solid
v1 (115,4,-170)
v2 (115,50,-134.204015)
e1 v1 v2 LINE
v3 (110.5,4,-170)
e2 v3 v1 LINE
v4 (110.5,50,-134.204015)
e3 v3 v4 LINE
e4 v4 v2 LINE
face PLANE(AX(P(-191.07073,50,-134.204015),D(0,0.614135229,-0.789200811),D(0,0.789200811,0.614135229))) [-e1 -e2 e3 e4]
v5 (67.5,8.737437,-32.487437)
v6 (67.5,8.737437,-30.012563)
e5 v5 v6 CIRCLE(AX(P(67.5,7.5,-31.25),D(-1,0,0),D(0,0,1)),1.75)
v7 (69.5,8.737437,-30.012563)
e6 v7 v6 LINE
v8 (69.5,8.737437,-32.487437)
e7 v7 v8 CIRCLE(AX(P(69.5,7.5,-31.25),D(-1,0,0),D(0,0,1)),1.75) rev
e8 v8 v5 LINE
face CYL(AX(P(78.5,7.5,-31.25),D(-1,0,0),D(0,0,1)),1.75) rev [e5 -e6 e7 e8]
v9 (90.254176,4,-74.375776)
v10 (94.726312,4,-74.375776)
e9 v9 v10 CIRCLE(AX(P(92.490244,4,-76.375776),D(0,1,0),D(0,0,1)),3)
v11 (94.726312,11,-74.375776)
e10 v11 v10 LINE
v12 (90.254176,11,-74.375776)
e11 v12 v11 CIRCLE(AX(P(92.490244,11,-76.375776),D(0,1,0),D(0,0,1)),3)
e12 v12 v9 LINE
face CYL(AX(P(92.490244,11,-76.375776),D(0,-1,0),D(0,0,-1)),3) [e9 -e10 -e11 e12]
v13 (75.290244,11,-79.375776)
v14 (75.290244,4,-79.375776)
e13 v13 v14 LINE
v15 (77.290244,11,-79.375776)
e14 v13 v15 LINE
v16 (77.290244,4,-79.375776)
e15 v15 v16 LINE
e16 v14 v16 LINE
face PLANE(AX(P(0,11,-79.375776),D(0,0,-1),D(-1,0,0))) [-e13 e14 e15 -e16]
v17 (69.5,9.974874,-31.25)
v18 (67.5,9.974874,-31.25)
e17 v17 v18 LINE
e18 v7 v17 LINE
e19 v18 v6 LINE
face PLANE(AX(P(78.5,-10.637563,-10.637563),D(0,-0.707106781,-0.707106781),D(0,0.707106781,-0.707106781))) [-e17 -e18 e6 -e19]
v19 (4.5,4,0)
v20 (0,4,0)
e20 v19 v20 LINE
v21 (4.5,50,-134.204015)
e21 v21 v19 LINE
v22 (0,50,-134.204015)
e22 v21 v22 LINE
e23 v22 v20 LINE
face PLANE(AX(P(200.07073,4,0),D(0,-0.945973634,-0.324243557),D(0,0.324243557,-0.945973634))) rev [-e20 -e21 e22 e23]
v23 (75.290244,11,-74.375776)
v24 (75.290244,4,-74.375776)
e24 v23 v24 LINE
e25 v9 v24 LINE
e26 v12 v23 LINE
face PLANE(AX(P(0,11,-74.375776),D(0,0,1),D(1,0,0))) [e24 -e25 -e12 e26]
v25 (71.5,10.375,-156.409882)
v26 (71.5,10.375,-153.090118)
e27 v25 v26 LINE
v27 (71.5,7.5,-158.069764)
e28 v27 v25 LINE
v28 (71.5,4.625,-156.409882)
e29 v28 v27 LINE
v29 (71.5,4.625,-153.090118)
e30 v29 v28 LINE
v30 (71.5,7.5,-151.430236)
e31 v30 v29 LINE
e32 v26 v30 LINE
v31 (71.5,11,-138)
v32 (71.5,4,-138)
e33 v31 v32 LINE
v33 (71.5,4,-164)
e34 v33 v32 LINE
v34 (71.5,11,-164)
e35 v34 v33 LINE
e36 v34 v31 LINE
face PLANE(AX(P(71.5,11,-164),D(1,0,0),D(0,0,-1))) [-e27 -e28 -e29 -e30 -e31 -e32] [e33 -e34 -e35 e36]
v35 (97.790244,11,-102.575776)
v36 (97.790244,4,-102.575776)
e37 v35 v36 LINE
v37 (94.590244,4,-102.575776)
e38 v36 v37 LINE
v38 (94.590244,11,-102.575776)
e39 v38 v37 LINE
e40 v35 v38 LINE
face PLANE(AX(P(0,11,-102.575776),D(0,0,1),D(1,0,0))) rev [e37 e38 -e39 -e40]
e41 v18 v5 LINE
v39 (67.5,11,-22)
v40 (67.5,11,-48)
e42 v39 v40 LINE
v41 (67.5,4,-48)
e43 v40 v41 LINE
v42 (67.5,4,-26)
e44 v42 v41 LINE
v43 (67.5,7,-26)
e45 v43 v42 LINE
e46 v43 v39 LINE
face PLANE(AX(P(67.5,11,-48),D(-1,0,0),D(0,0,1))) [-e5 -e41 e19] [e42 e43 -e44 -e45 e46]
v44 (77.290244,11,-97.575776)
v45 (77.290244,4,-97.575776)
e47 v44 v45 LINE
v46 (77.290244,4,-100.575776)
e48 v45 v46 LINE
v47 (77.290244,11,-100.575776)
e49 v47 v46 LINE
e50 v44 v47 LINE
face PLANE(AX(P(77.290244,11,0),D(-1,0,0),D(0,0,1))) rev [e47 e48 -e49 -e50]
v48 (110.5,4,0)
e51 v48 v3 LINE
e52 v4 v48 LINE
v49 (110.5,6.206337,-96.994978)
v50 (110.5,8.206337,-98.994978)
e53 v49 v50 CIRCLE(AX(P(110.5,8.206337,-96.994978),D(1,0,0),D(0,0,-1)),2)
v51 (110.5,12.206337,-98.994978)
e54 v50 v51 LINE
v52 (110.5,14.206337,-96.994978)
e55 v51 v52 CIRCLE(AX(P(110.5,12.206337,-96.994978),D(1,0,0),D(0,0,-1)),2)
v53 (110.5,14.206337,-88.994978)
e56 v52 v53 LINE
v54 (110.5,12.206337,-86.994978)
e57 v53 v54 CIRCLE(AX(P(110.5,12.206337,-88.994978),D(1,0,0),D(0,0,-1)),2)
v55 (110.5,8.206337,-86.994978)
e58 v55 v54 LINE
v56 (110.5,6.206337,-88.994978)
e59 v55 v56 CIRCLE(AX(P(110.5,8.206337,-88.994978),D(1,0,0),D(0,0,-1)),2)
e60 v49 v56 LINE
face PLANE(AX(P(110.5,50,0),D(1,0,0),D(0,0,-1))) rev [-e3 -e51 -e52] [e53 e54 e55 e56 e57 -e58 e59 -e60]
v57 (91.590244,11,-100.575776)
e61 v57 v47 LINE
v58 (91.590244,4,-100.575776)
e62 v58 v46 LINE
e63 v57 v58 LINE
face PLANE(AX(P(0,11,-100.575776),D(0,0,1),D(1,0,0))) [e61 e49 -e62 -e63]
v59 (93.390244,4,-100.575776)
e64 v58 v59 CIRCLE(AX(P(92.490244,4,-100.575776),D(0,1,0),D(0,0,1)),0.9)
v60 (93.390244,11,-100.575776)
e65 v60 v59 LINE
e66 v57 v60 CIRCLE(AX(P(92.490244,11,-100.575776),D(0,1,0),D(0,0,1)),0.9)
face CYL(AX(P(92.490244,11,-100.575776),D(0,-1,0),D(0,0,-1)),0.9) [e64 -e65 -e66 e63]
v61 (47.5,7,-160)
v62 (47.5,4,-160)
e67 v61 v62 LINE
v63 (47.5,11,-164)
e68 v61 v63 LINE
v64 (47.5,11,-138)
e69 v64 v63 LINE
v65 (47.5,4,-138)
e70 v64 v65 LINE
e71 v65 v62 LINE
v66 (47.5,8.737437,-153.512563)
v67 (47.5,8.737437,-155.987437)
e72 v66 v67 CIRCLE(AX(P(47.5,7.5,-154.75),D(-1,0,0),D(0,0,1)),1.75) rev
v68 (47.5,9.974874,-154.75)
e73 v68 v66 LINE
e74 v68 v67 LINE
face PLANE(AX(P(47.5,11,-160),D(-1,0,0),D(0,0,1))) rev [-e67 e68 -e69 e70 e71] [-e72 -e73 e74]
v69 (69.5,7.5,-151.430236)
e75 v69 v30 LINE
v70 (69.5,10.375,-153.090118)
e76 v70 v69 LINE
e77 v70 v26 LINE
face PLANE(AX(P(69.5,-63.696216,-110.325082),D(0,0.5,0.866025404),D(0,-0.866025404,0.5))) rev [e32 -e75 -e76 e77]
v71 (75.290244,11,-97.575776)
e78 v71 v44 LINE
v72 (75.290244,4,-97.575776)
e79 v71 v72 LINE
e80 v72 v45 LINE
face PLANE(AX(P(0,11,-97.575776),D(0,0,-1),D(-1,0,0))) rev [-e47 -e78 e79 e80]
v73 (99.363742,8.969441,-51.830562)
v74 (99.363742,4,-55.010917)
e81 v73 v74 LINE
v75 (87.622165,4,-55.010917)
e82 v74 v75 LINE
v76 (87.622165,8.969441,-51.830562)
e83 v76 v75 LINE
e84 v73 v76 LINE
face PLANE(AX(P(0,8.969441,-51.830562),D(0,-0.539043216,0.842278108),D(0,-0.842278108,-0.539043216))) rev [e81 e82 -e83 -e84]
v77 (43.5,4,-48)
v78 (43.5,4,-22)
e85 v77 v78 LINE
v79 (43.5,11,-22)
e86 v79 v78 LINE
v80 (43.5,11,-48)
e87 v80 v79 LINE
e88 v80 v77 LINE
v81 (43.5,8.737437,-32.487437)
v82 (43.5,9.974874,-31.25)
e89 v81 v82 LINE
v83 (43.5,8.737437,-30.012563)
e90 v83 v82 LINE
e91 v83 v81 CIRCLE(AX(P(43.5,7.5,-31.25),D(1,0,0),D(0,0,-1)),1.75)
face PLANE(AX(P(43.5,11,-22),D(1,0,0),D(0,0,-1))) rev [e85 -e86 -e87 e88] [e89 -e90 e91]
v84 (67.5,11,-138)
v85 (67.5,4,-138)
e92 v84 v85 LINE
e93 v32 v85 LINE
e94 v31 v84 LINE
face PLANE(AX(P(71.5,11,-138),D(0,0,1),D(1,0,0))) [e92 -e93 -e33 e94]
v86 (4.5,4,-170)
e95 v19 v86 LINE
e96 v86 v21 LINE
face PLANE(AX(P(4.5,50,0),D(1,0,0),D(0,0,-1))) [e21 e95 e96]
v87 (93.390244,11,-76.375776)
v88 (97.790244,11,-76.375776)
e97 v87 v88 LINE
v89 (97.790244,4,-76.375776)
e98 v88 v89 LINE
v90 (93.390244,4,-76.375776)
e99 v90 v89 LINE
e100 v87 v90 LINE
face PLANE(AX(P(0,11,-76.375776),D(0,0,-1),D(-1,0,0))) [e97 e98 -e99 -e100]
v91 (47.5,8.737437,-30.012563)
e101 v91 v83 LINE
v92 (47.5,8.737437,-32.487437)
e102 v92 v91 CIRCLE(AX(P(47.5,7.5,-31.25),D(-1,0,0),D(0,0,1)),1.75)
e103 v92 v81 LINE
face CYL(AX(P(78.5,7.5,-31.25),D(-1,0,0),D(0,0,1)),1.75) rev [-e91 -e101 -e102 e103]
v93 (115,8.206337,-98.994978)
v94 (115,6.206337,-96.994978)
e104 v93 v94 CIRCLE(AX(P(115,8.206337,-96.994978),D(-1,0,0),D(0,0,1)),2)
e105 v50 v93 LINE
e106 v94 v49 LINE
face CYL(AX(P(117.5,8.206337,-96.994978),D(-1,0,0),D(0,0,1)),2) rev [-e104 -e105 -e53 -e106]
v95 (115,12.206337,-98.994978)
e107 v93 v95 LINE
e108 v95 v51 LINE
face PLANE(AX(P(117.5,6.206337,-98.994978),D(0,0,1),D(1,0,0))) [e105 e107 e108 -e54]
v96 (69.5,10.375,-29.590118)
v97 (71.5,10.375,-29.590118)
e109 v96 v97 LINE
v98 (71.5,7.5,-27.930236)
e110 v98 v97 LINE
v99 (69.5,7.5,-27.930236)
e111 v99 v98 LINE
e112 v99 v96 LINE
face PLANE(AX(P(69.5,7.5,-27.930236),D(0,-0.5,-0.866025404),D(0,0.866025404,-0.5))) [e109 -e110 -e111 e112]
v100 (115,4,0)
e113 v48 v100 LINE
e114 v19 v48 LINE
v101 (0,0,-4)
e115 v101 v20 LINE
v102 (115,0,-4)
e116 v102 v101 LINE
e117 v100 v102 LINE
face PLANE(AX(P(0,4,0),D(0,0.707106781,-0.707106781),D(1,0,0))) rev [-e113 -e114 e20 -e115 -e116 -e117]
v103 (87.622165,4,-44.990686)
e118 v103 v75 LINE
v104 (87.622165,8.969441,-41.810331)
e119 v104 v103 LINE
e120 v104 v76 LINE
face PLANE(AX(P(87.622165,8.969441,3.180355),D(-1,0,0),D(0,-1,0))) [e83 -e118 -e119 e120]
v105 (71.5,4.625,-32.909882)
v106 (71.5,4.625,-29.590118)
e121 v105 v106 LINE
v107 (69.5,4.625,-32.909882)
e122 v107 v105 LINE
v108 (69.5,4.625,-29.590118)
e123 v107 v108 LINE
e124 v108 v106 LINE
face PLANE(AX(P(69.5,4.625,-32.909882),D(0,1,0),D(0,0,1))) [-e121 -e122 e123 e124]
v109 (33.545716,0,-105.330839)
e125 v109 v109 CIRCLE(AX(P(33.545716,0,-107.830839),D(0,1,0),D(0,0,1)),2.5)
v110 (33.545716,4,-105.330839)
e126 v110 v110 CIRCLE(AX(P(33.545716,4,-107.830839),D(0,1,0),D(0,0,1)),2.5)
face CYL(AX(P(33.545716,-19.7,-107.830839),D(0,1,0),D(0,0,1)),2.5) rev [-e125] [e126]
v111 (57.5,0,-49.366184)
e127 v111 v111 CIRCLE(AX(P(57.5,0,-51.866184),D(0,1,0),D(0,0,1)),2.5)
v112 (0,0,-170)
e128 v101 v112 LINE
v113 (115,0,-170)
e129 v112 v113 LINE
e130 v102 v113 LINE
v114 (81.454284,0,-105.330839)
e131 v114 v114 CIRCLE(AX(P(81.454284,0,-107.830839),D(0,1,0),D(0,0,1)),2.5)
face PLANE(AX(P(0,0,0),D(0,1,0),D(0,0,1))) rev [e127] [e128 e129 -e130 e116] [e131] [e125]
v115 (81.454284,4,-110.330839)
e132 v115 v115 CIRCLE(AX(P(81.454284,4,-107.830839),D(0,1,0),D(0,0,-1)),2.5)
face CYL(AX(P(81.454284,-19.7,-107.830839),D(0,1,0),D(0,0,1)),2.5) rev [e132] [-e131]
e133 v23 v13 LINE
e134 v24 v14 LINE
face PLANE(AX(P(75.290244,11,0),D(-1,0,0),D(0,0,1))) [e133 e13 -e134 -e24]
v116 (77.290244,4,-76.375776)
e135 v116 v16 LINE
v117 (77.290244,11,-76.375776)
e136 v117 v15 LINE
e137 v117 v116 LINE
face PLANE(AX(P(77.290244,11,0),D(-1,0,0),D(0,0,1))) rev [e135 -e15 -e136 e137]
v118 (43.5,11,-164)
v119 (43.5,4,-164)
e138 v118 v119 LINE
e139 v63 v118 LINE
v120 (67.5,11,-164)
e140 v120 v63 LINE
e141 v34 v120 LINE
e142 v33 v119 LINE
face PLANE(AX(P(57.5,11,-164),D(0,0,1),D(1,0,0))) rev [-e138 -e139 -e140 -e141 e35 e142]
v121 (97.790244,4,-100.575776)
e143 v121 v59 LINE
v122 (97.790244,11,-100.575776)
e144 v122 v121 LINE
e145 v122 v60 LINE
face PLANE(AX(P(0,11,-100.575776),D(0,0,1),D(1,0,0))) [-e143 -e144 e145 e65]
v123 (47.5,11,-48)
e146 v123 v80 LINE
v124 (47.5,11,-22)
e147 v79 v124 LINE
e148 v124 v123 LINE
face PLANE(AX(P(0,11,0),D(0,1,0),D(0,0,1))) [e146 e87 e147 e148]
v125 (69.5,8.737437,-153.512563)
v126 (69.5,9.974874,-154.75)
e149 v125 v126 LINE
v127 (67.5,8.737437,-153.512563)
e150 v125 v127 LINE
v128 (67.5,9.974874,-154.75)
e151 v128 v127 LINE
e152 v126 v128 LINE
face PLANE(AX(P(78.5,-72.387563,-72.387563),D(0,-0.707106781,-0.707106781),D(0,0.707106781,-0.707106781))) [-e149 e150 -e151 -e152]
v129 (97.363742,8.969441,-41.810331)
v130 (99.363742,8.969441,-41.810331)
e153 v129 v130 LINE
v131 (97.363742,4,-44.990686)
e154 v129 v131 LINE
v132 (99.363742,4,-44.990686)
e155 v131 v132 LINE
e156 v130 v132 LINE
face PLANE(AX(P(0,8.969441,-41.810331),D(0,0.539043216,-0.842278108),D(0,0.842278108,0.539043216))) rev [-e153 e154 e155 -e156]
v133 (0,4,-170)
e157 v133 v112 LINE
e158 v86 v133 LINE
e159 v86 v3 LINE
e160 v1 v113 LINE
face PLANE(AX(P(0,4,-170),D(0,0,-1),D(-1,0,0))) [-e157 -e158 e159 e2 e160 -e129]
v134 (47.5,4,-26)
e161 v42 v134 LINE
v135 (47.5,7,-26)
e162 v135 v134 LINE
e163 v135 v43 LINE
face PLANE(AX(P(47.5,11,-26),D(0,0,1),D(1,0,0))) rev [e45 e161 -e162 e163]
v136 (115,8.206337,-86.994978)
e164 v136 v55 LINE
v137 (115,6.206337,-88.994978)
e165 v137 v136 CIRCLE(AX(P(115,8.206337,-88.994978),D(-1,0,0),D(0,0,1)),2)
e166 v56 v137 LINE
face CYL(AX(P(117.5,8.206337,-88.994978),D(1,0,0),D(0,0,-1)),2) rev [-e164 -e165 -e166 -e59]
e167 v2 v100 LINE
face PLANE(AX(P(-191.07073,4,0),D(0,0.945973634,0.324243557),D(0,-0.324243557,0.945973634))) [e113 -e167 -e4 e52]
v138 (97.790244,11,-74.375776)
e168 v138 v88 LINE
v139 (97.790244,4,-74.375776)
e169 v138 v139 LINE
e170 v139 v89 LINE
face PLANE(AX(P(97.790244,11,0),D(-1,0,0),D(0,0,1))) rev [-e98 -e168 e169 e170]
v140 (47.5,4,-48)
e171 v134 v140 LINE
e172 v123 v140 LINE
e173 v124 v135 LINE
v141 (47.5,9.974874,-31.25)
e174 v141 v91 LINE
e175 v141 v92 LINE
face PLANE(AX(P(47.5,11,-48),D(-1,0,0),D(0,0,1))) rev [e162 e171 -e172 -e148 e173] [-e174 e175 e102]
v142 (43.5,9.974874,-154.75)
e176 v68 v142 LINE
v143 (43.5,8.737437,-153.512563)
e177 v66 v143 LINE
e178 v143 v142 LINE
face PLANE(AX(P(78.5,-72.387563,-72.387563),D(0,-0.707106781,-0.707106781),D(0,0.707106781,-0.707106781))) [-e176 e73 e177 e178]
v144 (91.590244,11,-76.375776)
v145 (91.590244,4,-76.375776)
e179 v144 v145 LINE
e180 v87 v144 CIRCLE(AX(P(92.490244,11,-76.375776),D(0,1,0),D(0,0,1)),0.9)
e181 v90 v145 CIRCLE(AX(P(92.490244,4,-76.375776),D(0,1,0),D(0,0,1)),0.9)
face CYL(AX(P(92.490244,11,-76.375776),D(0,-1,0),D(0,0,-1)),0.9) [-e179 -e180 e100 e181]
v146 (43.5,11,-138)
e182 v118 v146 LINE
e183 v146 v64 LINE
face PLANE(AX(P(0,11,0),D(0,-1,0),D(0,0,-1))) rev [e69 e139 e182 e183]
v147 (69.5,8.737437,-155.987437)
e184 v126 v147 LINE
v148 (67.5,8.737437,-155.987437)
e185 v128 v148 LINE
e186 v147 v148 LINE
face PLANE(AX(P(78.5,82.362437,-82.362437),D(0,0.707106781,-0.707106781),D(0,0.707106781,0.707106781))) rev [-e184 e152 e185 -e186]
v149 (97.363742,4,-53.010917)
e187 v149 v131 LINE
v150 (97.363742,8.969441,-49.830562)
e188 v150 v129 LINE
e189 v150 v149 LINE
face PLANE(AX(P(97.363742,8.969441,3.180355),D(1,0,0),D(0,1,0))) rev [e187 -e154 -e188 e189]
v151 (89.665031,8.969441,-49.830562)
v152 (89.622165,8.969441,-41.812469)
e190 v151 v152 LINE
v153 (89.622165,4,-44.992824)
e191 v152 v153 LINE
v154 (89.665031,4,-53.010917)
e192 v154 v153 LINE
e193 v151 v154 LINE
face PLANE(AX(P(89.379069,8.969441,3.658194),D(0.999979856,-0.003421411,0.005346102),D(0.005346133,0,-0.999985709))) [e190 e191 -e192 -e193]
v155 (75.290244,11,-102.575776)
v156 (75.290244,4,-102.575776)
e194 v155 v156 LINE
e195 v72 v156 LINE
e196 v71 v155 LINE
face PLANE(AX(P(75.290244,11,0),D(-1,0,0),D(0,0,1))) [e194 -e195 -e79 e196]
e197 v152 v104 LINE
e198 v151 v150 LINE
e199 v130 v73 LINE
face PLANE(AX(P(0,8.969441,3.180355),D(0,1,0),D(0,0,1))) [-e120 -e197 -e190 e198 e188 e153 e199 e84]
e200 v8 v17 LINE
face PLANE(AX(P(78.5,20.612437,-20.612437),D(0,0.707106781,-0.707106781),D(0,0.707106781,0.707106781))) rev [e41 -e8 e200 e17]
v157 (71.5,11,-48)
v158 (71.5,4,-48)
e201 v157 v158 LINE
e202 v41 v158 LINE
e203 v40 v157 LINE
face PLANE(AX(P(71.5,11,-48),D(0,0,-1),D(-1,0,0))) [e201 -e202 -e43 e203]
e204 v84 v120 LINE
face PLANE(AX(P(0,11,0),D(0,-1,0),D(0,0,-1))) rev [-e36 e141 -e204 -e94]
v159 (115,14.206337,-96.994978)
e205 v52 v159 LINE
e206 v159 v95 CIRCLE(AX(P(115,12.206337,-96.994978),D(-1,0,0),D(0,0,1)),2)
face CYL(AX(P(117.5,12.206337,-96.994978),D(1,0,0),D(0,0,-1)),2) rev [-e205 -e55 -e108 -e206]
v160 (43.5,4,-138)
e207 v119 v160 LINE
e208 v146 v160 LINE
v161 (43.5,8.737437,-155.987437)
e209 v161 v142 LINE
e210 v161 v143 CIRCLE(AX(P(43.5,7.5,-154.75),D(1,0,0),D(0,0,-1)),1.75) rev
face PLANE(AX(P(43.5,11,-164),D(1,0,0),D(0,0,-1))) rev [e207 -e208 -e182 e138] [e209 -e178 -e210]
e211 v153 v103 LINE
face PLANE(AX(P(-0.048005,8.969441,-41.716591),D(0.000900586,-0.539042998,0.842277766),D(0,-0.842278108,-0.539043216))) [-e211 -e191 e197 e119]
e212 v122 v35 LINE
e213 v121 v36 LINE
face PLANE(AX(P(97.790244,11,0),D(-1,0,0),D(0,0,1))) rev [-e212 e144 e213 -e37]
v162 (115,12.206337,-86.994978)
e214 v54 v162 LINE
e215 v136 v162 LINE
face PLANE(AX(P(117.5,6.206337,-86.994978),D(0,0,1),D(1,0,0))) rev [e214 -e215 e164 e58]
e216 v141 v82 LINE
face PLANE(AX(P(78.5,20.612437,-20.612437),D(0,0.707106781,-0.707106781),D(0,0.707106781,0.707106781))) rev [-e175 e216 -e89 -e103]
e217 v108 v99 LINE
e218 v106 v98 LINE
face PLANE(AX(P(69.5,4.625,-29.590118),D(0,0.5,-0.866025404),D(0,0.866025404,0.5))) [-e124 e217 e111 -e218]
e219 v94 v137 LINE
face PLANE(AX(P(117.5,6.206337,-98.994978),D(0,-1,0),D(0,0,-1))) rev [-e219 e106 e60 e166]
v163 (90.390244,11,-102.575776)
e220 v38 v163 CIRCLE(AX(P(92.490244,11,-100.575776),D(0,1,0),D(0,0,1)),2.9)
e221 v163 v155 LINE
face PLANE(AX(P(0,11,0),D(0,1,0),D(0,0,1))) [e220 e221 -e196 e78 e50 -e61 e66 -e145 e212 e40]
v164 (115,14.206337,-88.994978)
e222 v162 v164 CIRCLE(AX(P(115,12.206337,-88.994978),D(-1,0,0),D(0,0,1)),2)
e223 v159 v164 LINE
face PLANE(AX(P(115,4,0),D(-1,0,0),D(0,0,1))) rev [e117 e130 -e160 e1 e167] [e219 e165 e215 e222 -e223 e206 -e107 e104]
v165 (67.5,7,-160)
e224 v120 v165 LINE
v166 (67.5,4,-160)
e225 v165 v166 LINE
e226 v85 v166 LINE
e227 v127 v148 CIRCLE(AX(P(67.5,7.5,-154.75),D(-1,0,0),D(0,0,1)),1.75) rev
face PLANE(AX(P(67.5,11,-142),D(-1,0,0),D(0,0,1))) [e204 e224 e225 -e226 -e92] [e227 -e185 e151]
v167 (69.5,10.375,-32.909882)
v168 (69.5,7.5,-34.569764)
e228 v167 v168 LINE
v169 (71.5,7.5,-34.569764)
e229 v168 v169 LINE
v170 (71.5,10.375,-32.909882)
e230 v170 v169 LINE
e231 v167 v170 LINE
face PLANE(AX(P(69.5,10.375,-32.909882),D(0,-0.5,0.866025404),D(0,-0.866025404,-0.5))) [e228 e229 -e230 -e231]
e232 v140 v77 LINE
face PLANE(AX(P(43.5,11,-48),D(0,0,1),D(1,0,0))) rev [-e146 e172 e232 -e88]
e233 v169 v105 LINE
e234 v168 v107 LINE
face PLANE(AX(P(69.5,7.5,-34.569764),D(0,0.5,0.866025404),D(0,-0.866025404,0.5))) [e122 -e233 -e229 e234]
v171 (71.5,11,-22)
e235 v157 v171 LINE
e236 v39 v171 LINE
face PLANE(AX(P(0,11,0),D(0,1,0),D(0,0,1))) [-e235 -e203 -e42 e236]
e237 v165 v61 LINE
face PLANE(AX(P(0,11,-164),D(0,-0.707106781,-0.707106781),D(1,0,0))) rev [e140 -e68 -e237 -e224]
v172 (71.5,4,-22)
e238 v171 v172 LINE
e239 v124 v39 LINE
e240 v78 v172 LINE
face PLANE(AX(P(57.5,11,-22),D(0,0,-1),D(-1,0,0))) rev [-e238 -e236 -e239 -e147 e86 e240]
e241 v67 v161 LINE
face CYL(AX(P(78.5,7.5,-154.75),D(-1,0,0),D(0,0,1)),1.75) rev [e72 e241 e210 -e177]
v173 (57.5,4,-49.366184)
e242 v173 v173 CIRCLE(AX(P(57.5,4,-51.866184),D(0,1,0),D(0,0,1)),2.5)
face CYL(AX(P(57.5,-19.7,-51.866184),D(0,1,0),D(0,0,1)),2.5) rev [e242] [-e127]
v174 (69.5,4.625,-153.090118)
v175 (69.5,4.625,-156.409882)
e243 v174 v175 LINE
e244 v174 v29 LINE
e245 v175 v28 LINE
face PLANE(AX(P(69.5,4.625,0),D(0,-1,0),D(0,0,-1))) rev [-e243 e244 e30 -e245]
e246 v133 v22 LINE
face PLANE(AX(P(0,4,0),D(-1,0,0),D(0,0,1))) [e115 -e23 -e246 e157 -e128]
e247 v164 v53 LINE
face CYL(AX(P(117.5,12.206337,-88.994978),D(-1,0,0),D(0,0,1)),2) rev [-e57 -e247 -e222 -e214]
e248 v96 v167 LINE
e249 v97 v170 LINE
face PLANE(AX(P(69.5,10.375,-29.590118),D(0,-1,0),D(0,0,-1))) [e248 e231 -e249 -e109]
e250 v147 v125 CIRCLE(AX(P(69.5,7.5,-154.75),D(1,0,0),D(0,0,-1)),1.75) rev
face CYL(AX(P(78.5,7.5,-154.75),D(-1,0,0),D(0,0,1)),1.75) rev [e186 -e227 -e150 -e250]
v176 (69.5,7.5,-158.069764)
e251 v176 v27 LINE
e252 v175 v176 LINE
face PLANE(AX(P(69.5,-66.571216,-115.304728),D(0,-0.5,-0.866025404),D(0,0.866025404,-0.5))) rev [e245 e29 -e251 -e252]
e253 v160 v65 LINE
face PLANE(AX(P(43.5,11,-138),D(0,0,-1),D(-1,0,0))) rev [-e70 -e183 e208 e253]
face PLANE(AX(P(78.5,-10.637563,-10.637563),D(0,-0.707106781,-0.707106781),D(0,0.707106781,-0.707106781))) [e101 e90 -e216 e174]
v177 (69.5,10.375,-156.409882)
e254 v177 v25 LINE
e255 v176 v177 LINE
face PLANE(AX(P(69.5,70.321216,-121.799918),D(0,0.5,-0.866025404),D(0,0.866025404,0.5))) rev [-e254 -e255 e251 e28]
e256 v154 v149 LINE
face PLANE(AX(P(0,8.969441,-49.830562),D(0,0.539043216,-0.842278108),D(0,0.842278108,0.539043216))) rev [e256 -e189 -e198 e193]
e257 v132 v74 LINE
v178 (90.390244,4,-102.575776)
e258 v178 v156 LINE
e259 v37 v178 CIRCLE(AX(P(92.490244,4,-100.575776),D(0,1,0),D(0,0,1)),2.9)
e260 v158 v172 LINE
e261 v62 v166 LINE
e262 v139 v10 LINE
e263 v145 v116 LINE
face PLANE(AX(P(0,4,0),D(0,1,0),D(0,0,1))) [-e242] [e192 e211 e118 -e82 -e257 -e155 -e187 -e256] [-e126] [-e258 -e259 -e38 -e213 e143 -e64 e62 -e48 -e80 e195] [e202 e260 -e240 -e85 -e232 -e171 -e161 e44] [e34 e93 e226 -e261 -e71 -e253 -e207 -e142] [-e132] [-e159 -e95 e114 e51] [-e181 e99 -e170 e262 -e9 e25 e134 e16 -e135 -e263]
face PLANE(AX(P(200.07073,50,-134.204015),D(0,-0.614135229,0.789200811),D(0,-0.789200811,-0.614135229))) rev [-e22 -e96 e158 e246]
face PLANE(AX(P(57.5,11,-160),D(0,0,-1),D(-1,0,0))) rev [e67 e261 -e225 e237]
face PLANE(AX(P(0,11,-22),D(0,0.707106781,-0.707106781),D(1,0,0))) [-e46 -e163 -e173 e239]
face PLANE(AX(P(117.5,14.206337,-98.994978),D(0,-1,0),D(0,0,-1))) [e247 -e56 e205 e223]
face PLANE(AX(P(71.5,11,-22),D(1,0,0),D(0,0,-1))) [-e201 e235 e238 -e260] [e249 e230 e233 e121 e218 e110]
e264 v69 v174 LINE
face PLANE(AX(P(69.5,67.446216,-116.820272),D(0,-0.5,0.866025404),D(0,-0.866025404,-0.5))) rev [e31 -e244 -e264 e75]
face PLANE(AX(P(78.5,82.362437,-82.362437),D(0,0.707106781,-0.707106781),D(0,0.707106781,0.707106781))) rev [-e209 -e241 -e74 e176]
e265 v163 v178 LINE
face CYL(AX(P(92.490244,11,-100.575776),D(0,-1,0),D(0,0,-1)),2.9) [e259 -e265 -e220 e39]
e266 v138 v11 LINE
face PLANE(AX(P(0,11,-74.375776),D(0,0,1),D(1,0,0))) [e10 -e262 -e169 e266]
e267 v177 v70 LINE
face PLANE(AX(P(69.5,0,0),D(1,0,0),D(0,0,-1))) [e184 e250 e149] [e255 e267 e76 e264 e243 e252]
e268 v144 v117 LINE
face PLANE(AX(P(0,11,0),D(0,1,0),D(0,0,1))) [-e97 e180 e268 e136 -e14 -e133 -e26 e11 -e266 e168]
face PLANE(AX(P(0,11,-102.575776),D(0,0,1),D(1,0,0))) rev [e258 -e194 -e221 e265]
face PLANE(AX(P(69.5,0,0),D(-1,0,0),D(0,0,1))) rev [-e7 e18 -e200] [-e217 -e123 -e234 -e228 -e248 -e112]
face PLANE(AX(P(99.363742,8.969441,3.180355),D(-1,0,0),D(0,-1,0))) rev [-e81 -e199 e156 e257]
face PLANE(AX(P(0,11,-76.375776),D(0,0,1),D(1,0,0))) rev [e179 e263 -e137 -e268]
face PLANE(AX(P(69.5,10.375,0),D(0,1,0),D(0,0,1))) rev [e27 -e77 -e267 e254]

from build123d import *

# Parameters (mm, degrees)
SKETCH1_W                  = 110.5
SKETCH1_H                  = 170
SKETCH1_W_2                = 4.5
BOSS_EXTRUDE1_DEPTH        = 4
SKETCH1_4_W                = 4.5
SKETCH1_4_H                = 170
BOSS_EXTRUDE2_DEPTH        = 50
CUT_EXTRUDE1_DEPTH         = 4.5
SALIENTE_EXTRUIR1_DEPTH    = 7
SALIENTE_EXTRUIR2_DEPTH    = 7
CORTAR_EXTRUIR1_DEPTH      = 31
CORTAR_EXTRUIR1_DEPTH_BACK = 7
CORTAR_EXTRUIR2_DEPTH      = 2
CHAFL_N1_SIZE              = 4
CHAFL_N2_SIZE              = 4
CROQUIS5_R                 = 2.5
CORTAR_EXTRUIR3_DEPTH      = 23.7
CHAFL_N3_SIZE              = 4
SALIENTE_EXTRUIR4_DEPTH    = 7
CROQUIS8_W                 = 12
CROQUIS8_H                 = 8
CORTAR_EXTRUIR4_DEPTH      = 7
REDONDEO1_R                = 2


with BuildPart() as part:
    # Sketch1 → Boss-Extrude1 (new body)
    with BuildSketch(Plane(origin=(0, 0, 0), x_dir=(1, 0, 0), z_dir=(0, 1, 0))):
        with Locations((59.75, 85)):
            Rectangle(SKETCH1_W, SKETCH1_H)
        with Locations((2.25, 85)):
            Rectangle(SKETCH1_W_2, SKETCH1_H)
    extrude(amount=BOSS_EXTRUDE1_DEPTH)

    # Sketch1<4> → Boss-Extrude2 (add)
    with BuildSketch(Plane(origin=(0, 0, 0), x_dir=(1, 0, 0), z_dir=(0, 1, 0))):
        with Locations((2.25, 85)):
            Rectangle(SKETCH1_4_W, SKETCH1_4_H)
    boss_extrude2 = extrude(amount=BOSS_EXTRUDE2_DEPTH)

    # Sketch2 → Cut-Extrude1 (cut)
    with BuildSketch(Plane.ZY):
        Polygon((-134.204014838, 50), (-170, 4), (-182.392562203, 4), (-182.392562203, 57.402643918), (5.745866014, 57.402643918), (5.745866014, 4), (0, 4), align=None)
    cut_extrude1 = extrude(amount=-CUT_EXTRUDE1_DEPTH, mode=Mode.SUBTRACT)

    # Mirror1: Boss-Extrude2, Cut-Extrude1 across plane
    add(boss_extrude2.mirror(Plane(origin=(57.5, 0, 0), x_dir=(0, 0, 1), z_dir=(1, 0, 0))))
    add(cut_extrude1.mirror(Plane(origin=(57.5, 0, 0), x_dir=(0, 0, 1), z_dir=(1, 0, 0))), mode=Mode.SUBTRACT)

    # Sketch3 → Saliente-Extruir1 (add)
    with BuildSketch(Plane(origin=(0, 4, 0), x_dir=(1, 0, 0), z_dir=(0, 1, 0))):
        Polygon((57.5, 160), (47.5, 160), (47.5, 142), (47.5, 138), (43.5, 138), (43.5, 164), (57.5, 164), align=None)
    saliente_extruir1 = extrude(amount=SALIENTE_EXTRUIR1_DEPTH)

    # Croquis1 → Saliente-Extruir2 (add)
    with BuildSketch(Plane(origin=(0, 4, 0), x_dir=(1, 0, 0), z_dir=(0, 1, 0))):
        Polygon((57.5, 26), (57.5, 22), (43.5, 22), (43.5, 48), (47.5, 48), (47.5, 26), align=None)
    saliente_extruir2 = extrude(amount=SALIENTE_EXTRUIR2_DEPTH)

    # Simetría1: Saliente-Extruir1, Saliente-Extruir2 across plane
    add(saliente_extruir1.mirror(Plane(origin=(57.5, 11, -164), x_dir=(0, 0, 1), z_dir=(-1, 0, 0))))
    add(saliente_extruir2.mirror(Plane(origin=(57.5, 11, -164), x_dir=(0, 0, 1), z_dir=(-1, 0, 0))))

    # Croquis2 → Cortar-Extruir1 (cut, two sides: drawn at the far end of the back side and taken through both)
    with BuildSketch(Plane(origin=(47.5, 0, 0), x_dir=(0, 0, -1), z_dir=(1, 0, 0)).offset(-CORTAR_EXTRUIR1_DEPTH_BACK)):
        with BuildLine():
            Line((31.25, 9.974873734), (32.487436867, 8.737436867))
            ThreePointArc((32.487436867, 8.737436867), (31.25, 5.75), (30.012563133, 8.737436867))
            Line((30.012563133, 8.737436867), (31.25, 9.974873734))
        make_face()
        with BuildLine():
            Line((154.75, 9.974873734), (155.987436867, 8.737436867))
            ThreePointArc((155.987436867, 8.737436867), (154.75, 5.75), (153.512563133, 8.737436867))
            Line((153.512563133, 8.737436867), (154.75, 9.974873734))
        make_face()
    extrude(amount=CORTAR_EXTRUIR1_DEPTH + CORTAR_EXTRUIR1_DEPTH_BACK, mode=Mode.SUBTRACT)

    # Croquis4 → Cortar-Extruir2 (cut)
    with BuildSketch(Plane(origin=(71.5, 0, 0), x_dir=(0, 0, -1), z_dir=(1, 0, 0))):
        Polygon((158.069764048, 7.5), (156.409882024, 10.375), (153.090117976, 10.375), (151.430235952, 7.5), (153.090117976, 4.625), (156.409882024, 4.625), align=None)
        Polygon((29.590117976, 4.625), (27.930235952, 7.5), (29.590117976, 10.375), (32.909882024, 10.375), (34.569764048, 7.5), (32.909882024, 4.625), align=None)
    extrude(amount=-CORTAR_EXTRUIR2_DEPTH, mode=Mode.SUBTRACT)

    # Chaflán1
    chafl_n1_edges = [part.edges().sort_by_distance(p)[0] for p in [
        (57.5, 11, -26),
    ]]
    chamfer(chafl_n1_edges, length=CHAFL_N1_SIZE - 0.0001)  # a hair under: the kernel refuses the full size

    # Chaflán2
    chafl_n2_edges = [part.edges().sort_by_distance(p)[0] for p in [
        (57.5, 11, -160),
    ]]
    chamfer(chafl_n2_edges, length=CHAFL_N2_SIZE - 0.0001)  # a hair under: the kernel refuses the full size

    # Croquis5 → Cortar-Extruir3 (cut)
    with BuildSketch(Plane(origin=(0, 4, 0), x_dir=(1, 0, 0), z_dir=(0, 1, 0))):
        with Locations(Location((33.545716199, 107.830838948, 0), (0, 0, 270))):
            Circle(CROQUIS5_R)
        with Locations(Location((57.5, 51.866184435, 0), (0, 0, 270))):
            Circle(CROQUIS5_R)
        with Locations(Location((81.454283801, 107.830838948, 0), (0, 0, 270))):
            Circle(CROQUIS5_R)
    extrude(amount=-CORTAR_EXTRUIR3_DEPTH, mode=Mode.SUBTRACT)

    # Chaflán3
    chafl_n3_edges = [part.edges().sort_by_distance(p)[0] for p in [
        (57.5, 0, 0),
    ]]
    chamfer(chafl_n3_edges, length=CHAFL_N3_SIZE - 0.0001)  # a hair under: the kernel refuses the full size

    # Saliente-Extruir3: read off the stored shape, not the designer's step
    # Saliente-Extruir3: loft between two sections, ruled curve by curve
    saliente_extruir3_from = [
        Edge.make_line((89.622165017, 4, -44.992823986), (87.622165017, 4, -44.990685532)),
        Edge.make_line((89.66503142, 4, -53.010916957), (89.622165017, 4, -44.992823986)),
        Edge.make_line((89.66503142, 4, -53.010916957), (97.363741989, 4, -53.010916957)),
        Edge.make_line((97.363741989, 4, -53.010916957), (97.363741989, 4, -44.990685532)),
        Edge.make_line((97.363741989, 4, -44.990685532), (99.363741989, 4, -44.990685532)),
        Edge.make_line((99.363741989, 4, -44.990685532), (99.363741989, 4, -55.010916957)),
        Edge.make_line((99.363741989, 4, -55.010916957), (87.622165017, 4, -55.010916957)),
        Edge.make_line((87.622165017, 4, -44.990685532), (87.622165017, 4, -55.010916957)),
    ]
    saliente_extruir3_to = [
        Edge.make_line((89.622165017, 8.969440836, -41.812469009), (87.622165017, 8.969440836, -41.810330556)),
        Edge.make_line((89.66503142, 8.969440836, -49.83056198), (89.622165017, 8.969440836, -41.812469009)),
        Edge.make_line((89.66503142, 8.969440836, -49.83056198), (97.363741989, 8.969440836, -49.83056198)),
        Edge.make_line((97.363741989, 8.969440836, -49.83056198), (97.363741989, 8.969440836, -41.810330556)),
        Edge.make_line((97.363741989, 8.969440836, -41.810330556), (99.363741989, 8.969440836, -41.810330556)),
        Edge.make_line((99.363741989, 8.969440836, -41.810330556), (99.363741989, 8.969440836, -51.83056198)),
        Edge.make_line((99.363741989, 8.969440836, -51.83056198), (87.622165017, 8.969440836, -51.83056198)),
        Edge.make_line((87.622165017, 8.969440836, -41.810330556), (87.622165017, 8.969440836, -51.83056198)),
    ]
    saliente_extruir3 = Solid(Shell([*[Face.make_surface_from_curves(saliente_extruir3_from[k], saliente_extruir3_to[k]) for k in range(8)], Face(Wire(saliente_extruir3_from)), Face(Wire(saliente_extruir3_to))]))
    add(saliente_extruir3)

    # Croquis7 → Saliente-Extruir4 (add)
    with BuildSketch(Plane(origin=(0, 4, 0), x_dir=(1, 0, 0), z_dir=(0, 1, 0))):
        with BuildLine():
            Line((93.557674933, 100.575775557), (95.79024416, 100.575775557))
            Line((95.79024416, 100.575775557), (97.79024416, 100.575775557))
            Line((97.79024416, 100.575775557), (97.79024416, 102.575775557))
            Line((97.79024416, 102.575775557), (94.59024416, 102.575775557))
            ThreePointArc((94.59024416, 102.575775557), (92.49024416, 103.475775557), (90.39024416, 102.575775557))
            Line((90.39024416, 102.575775557), (75.29024416, 102.575775557))
            Line((75.29024416, 102.575775557), (75.29024416, 97.575775557))
            Line((75.29024416, 97.575775557), (77.29024416, 97.575775557))
            Line((77.29024416, 97.575775557), (77.29024416, 100.575775557))
            Line((77.29024416, 100.575775557), (80.20924649, 100.575775557))
            Line((80.20924649, 100.575775557), (91.59024416, 100.575775557))
            ThreePointArc((91.59024416, 100.575775557), (92.49024416, 99.675775557), (93.39024416, 100.575775557))
            Line((93.39024416, 100.575775557), (93.557674933, 100.575775557))
        make_face()
        with BuildLine():
            Line((94.726312137, 74.375775557), (97.79024416, 74.375775557))
            Line((97.79024416, 74.375775557), (97.79024416, 76.375775557))
            Line((97.79024416, 76.375775557), (95.79024416, 76.375775557))
            Line((95.79024416, 76.375775557), (93.39024416, 76.375775557))
            ThreePointArc((93.39024416, 76.375775557), (92.49024416, 77.275775557), (91.59024416, 76.375775557))
            Line((91.59024416, 76.375775557), (83.611986998, 76.375775557))
            Line((83.611986998, 76.375775557), (77.29024416, 76.375775557))
            Line((77.29024416, 76.375775557), (77.29024416, 79.375775557))
            Line((77.29024416, 79.375775557), (75.29024416, 79.375775557))
            Line((75.29024416, 79.375775557), (75.29024416, 74.375775557))
            Line((75.29024416, 74.375775557), (90.254176182, 74.375775557))
            ThreePointArc((90.254176182, 74.375775557), (92.49024416, 73.375775557), (94.726312137, 74.375775557))
        make_face()
    extrude(amount=SALIENTE_EXTRUIR4_DEPTH)

    # Croquis8 → Cortar-Extruir4 (cut)
    with BuildSketch(Plane.ZY.offset(-110.5)):
        with Locations((-92.994977689, 10.20633678)):
            Rectangle(CROQUIS8_W, CROQUIS8_H)
    extrude(amount=-CORTAR_EXTRUIR4_DEPTH, mode=Mode.SUBTRACT)

    # Redondeo1
    redondeo1_edges = [part.edges().sort_by_distance(p)[0] for p in [
        (112.75, 14.20633678, -98.994977689),
        (112.75, 14.20633678, -86.994977689),
        (112.75, 6.20633678, -86.994977689),
        (112.75, 6.20633678, -98.994977689),
    ]]
    fillet(redondeo1_edges, radius=REDONDEO1_R)


solid = part.part
